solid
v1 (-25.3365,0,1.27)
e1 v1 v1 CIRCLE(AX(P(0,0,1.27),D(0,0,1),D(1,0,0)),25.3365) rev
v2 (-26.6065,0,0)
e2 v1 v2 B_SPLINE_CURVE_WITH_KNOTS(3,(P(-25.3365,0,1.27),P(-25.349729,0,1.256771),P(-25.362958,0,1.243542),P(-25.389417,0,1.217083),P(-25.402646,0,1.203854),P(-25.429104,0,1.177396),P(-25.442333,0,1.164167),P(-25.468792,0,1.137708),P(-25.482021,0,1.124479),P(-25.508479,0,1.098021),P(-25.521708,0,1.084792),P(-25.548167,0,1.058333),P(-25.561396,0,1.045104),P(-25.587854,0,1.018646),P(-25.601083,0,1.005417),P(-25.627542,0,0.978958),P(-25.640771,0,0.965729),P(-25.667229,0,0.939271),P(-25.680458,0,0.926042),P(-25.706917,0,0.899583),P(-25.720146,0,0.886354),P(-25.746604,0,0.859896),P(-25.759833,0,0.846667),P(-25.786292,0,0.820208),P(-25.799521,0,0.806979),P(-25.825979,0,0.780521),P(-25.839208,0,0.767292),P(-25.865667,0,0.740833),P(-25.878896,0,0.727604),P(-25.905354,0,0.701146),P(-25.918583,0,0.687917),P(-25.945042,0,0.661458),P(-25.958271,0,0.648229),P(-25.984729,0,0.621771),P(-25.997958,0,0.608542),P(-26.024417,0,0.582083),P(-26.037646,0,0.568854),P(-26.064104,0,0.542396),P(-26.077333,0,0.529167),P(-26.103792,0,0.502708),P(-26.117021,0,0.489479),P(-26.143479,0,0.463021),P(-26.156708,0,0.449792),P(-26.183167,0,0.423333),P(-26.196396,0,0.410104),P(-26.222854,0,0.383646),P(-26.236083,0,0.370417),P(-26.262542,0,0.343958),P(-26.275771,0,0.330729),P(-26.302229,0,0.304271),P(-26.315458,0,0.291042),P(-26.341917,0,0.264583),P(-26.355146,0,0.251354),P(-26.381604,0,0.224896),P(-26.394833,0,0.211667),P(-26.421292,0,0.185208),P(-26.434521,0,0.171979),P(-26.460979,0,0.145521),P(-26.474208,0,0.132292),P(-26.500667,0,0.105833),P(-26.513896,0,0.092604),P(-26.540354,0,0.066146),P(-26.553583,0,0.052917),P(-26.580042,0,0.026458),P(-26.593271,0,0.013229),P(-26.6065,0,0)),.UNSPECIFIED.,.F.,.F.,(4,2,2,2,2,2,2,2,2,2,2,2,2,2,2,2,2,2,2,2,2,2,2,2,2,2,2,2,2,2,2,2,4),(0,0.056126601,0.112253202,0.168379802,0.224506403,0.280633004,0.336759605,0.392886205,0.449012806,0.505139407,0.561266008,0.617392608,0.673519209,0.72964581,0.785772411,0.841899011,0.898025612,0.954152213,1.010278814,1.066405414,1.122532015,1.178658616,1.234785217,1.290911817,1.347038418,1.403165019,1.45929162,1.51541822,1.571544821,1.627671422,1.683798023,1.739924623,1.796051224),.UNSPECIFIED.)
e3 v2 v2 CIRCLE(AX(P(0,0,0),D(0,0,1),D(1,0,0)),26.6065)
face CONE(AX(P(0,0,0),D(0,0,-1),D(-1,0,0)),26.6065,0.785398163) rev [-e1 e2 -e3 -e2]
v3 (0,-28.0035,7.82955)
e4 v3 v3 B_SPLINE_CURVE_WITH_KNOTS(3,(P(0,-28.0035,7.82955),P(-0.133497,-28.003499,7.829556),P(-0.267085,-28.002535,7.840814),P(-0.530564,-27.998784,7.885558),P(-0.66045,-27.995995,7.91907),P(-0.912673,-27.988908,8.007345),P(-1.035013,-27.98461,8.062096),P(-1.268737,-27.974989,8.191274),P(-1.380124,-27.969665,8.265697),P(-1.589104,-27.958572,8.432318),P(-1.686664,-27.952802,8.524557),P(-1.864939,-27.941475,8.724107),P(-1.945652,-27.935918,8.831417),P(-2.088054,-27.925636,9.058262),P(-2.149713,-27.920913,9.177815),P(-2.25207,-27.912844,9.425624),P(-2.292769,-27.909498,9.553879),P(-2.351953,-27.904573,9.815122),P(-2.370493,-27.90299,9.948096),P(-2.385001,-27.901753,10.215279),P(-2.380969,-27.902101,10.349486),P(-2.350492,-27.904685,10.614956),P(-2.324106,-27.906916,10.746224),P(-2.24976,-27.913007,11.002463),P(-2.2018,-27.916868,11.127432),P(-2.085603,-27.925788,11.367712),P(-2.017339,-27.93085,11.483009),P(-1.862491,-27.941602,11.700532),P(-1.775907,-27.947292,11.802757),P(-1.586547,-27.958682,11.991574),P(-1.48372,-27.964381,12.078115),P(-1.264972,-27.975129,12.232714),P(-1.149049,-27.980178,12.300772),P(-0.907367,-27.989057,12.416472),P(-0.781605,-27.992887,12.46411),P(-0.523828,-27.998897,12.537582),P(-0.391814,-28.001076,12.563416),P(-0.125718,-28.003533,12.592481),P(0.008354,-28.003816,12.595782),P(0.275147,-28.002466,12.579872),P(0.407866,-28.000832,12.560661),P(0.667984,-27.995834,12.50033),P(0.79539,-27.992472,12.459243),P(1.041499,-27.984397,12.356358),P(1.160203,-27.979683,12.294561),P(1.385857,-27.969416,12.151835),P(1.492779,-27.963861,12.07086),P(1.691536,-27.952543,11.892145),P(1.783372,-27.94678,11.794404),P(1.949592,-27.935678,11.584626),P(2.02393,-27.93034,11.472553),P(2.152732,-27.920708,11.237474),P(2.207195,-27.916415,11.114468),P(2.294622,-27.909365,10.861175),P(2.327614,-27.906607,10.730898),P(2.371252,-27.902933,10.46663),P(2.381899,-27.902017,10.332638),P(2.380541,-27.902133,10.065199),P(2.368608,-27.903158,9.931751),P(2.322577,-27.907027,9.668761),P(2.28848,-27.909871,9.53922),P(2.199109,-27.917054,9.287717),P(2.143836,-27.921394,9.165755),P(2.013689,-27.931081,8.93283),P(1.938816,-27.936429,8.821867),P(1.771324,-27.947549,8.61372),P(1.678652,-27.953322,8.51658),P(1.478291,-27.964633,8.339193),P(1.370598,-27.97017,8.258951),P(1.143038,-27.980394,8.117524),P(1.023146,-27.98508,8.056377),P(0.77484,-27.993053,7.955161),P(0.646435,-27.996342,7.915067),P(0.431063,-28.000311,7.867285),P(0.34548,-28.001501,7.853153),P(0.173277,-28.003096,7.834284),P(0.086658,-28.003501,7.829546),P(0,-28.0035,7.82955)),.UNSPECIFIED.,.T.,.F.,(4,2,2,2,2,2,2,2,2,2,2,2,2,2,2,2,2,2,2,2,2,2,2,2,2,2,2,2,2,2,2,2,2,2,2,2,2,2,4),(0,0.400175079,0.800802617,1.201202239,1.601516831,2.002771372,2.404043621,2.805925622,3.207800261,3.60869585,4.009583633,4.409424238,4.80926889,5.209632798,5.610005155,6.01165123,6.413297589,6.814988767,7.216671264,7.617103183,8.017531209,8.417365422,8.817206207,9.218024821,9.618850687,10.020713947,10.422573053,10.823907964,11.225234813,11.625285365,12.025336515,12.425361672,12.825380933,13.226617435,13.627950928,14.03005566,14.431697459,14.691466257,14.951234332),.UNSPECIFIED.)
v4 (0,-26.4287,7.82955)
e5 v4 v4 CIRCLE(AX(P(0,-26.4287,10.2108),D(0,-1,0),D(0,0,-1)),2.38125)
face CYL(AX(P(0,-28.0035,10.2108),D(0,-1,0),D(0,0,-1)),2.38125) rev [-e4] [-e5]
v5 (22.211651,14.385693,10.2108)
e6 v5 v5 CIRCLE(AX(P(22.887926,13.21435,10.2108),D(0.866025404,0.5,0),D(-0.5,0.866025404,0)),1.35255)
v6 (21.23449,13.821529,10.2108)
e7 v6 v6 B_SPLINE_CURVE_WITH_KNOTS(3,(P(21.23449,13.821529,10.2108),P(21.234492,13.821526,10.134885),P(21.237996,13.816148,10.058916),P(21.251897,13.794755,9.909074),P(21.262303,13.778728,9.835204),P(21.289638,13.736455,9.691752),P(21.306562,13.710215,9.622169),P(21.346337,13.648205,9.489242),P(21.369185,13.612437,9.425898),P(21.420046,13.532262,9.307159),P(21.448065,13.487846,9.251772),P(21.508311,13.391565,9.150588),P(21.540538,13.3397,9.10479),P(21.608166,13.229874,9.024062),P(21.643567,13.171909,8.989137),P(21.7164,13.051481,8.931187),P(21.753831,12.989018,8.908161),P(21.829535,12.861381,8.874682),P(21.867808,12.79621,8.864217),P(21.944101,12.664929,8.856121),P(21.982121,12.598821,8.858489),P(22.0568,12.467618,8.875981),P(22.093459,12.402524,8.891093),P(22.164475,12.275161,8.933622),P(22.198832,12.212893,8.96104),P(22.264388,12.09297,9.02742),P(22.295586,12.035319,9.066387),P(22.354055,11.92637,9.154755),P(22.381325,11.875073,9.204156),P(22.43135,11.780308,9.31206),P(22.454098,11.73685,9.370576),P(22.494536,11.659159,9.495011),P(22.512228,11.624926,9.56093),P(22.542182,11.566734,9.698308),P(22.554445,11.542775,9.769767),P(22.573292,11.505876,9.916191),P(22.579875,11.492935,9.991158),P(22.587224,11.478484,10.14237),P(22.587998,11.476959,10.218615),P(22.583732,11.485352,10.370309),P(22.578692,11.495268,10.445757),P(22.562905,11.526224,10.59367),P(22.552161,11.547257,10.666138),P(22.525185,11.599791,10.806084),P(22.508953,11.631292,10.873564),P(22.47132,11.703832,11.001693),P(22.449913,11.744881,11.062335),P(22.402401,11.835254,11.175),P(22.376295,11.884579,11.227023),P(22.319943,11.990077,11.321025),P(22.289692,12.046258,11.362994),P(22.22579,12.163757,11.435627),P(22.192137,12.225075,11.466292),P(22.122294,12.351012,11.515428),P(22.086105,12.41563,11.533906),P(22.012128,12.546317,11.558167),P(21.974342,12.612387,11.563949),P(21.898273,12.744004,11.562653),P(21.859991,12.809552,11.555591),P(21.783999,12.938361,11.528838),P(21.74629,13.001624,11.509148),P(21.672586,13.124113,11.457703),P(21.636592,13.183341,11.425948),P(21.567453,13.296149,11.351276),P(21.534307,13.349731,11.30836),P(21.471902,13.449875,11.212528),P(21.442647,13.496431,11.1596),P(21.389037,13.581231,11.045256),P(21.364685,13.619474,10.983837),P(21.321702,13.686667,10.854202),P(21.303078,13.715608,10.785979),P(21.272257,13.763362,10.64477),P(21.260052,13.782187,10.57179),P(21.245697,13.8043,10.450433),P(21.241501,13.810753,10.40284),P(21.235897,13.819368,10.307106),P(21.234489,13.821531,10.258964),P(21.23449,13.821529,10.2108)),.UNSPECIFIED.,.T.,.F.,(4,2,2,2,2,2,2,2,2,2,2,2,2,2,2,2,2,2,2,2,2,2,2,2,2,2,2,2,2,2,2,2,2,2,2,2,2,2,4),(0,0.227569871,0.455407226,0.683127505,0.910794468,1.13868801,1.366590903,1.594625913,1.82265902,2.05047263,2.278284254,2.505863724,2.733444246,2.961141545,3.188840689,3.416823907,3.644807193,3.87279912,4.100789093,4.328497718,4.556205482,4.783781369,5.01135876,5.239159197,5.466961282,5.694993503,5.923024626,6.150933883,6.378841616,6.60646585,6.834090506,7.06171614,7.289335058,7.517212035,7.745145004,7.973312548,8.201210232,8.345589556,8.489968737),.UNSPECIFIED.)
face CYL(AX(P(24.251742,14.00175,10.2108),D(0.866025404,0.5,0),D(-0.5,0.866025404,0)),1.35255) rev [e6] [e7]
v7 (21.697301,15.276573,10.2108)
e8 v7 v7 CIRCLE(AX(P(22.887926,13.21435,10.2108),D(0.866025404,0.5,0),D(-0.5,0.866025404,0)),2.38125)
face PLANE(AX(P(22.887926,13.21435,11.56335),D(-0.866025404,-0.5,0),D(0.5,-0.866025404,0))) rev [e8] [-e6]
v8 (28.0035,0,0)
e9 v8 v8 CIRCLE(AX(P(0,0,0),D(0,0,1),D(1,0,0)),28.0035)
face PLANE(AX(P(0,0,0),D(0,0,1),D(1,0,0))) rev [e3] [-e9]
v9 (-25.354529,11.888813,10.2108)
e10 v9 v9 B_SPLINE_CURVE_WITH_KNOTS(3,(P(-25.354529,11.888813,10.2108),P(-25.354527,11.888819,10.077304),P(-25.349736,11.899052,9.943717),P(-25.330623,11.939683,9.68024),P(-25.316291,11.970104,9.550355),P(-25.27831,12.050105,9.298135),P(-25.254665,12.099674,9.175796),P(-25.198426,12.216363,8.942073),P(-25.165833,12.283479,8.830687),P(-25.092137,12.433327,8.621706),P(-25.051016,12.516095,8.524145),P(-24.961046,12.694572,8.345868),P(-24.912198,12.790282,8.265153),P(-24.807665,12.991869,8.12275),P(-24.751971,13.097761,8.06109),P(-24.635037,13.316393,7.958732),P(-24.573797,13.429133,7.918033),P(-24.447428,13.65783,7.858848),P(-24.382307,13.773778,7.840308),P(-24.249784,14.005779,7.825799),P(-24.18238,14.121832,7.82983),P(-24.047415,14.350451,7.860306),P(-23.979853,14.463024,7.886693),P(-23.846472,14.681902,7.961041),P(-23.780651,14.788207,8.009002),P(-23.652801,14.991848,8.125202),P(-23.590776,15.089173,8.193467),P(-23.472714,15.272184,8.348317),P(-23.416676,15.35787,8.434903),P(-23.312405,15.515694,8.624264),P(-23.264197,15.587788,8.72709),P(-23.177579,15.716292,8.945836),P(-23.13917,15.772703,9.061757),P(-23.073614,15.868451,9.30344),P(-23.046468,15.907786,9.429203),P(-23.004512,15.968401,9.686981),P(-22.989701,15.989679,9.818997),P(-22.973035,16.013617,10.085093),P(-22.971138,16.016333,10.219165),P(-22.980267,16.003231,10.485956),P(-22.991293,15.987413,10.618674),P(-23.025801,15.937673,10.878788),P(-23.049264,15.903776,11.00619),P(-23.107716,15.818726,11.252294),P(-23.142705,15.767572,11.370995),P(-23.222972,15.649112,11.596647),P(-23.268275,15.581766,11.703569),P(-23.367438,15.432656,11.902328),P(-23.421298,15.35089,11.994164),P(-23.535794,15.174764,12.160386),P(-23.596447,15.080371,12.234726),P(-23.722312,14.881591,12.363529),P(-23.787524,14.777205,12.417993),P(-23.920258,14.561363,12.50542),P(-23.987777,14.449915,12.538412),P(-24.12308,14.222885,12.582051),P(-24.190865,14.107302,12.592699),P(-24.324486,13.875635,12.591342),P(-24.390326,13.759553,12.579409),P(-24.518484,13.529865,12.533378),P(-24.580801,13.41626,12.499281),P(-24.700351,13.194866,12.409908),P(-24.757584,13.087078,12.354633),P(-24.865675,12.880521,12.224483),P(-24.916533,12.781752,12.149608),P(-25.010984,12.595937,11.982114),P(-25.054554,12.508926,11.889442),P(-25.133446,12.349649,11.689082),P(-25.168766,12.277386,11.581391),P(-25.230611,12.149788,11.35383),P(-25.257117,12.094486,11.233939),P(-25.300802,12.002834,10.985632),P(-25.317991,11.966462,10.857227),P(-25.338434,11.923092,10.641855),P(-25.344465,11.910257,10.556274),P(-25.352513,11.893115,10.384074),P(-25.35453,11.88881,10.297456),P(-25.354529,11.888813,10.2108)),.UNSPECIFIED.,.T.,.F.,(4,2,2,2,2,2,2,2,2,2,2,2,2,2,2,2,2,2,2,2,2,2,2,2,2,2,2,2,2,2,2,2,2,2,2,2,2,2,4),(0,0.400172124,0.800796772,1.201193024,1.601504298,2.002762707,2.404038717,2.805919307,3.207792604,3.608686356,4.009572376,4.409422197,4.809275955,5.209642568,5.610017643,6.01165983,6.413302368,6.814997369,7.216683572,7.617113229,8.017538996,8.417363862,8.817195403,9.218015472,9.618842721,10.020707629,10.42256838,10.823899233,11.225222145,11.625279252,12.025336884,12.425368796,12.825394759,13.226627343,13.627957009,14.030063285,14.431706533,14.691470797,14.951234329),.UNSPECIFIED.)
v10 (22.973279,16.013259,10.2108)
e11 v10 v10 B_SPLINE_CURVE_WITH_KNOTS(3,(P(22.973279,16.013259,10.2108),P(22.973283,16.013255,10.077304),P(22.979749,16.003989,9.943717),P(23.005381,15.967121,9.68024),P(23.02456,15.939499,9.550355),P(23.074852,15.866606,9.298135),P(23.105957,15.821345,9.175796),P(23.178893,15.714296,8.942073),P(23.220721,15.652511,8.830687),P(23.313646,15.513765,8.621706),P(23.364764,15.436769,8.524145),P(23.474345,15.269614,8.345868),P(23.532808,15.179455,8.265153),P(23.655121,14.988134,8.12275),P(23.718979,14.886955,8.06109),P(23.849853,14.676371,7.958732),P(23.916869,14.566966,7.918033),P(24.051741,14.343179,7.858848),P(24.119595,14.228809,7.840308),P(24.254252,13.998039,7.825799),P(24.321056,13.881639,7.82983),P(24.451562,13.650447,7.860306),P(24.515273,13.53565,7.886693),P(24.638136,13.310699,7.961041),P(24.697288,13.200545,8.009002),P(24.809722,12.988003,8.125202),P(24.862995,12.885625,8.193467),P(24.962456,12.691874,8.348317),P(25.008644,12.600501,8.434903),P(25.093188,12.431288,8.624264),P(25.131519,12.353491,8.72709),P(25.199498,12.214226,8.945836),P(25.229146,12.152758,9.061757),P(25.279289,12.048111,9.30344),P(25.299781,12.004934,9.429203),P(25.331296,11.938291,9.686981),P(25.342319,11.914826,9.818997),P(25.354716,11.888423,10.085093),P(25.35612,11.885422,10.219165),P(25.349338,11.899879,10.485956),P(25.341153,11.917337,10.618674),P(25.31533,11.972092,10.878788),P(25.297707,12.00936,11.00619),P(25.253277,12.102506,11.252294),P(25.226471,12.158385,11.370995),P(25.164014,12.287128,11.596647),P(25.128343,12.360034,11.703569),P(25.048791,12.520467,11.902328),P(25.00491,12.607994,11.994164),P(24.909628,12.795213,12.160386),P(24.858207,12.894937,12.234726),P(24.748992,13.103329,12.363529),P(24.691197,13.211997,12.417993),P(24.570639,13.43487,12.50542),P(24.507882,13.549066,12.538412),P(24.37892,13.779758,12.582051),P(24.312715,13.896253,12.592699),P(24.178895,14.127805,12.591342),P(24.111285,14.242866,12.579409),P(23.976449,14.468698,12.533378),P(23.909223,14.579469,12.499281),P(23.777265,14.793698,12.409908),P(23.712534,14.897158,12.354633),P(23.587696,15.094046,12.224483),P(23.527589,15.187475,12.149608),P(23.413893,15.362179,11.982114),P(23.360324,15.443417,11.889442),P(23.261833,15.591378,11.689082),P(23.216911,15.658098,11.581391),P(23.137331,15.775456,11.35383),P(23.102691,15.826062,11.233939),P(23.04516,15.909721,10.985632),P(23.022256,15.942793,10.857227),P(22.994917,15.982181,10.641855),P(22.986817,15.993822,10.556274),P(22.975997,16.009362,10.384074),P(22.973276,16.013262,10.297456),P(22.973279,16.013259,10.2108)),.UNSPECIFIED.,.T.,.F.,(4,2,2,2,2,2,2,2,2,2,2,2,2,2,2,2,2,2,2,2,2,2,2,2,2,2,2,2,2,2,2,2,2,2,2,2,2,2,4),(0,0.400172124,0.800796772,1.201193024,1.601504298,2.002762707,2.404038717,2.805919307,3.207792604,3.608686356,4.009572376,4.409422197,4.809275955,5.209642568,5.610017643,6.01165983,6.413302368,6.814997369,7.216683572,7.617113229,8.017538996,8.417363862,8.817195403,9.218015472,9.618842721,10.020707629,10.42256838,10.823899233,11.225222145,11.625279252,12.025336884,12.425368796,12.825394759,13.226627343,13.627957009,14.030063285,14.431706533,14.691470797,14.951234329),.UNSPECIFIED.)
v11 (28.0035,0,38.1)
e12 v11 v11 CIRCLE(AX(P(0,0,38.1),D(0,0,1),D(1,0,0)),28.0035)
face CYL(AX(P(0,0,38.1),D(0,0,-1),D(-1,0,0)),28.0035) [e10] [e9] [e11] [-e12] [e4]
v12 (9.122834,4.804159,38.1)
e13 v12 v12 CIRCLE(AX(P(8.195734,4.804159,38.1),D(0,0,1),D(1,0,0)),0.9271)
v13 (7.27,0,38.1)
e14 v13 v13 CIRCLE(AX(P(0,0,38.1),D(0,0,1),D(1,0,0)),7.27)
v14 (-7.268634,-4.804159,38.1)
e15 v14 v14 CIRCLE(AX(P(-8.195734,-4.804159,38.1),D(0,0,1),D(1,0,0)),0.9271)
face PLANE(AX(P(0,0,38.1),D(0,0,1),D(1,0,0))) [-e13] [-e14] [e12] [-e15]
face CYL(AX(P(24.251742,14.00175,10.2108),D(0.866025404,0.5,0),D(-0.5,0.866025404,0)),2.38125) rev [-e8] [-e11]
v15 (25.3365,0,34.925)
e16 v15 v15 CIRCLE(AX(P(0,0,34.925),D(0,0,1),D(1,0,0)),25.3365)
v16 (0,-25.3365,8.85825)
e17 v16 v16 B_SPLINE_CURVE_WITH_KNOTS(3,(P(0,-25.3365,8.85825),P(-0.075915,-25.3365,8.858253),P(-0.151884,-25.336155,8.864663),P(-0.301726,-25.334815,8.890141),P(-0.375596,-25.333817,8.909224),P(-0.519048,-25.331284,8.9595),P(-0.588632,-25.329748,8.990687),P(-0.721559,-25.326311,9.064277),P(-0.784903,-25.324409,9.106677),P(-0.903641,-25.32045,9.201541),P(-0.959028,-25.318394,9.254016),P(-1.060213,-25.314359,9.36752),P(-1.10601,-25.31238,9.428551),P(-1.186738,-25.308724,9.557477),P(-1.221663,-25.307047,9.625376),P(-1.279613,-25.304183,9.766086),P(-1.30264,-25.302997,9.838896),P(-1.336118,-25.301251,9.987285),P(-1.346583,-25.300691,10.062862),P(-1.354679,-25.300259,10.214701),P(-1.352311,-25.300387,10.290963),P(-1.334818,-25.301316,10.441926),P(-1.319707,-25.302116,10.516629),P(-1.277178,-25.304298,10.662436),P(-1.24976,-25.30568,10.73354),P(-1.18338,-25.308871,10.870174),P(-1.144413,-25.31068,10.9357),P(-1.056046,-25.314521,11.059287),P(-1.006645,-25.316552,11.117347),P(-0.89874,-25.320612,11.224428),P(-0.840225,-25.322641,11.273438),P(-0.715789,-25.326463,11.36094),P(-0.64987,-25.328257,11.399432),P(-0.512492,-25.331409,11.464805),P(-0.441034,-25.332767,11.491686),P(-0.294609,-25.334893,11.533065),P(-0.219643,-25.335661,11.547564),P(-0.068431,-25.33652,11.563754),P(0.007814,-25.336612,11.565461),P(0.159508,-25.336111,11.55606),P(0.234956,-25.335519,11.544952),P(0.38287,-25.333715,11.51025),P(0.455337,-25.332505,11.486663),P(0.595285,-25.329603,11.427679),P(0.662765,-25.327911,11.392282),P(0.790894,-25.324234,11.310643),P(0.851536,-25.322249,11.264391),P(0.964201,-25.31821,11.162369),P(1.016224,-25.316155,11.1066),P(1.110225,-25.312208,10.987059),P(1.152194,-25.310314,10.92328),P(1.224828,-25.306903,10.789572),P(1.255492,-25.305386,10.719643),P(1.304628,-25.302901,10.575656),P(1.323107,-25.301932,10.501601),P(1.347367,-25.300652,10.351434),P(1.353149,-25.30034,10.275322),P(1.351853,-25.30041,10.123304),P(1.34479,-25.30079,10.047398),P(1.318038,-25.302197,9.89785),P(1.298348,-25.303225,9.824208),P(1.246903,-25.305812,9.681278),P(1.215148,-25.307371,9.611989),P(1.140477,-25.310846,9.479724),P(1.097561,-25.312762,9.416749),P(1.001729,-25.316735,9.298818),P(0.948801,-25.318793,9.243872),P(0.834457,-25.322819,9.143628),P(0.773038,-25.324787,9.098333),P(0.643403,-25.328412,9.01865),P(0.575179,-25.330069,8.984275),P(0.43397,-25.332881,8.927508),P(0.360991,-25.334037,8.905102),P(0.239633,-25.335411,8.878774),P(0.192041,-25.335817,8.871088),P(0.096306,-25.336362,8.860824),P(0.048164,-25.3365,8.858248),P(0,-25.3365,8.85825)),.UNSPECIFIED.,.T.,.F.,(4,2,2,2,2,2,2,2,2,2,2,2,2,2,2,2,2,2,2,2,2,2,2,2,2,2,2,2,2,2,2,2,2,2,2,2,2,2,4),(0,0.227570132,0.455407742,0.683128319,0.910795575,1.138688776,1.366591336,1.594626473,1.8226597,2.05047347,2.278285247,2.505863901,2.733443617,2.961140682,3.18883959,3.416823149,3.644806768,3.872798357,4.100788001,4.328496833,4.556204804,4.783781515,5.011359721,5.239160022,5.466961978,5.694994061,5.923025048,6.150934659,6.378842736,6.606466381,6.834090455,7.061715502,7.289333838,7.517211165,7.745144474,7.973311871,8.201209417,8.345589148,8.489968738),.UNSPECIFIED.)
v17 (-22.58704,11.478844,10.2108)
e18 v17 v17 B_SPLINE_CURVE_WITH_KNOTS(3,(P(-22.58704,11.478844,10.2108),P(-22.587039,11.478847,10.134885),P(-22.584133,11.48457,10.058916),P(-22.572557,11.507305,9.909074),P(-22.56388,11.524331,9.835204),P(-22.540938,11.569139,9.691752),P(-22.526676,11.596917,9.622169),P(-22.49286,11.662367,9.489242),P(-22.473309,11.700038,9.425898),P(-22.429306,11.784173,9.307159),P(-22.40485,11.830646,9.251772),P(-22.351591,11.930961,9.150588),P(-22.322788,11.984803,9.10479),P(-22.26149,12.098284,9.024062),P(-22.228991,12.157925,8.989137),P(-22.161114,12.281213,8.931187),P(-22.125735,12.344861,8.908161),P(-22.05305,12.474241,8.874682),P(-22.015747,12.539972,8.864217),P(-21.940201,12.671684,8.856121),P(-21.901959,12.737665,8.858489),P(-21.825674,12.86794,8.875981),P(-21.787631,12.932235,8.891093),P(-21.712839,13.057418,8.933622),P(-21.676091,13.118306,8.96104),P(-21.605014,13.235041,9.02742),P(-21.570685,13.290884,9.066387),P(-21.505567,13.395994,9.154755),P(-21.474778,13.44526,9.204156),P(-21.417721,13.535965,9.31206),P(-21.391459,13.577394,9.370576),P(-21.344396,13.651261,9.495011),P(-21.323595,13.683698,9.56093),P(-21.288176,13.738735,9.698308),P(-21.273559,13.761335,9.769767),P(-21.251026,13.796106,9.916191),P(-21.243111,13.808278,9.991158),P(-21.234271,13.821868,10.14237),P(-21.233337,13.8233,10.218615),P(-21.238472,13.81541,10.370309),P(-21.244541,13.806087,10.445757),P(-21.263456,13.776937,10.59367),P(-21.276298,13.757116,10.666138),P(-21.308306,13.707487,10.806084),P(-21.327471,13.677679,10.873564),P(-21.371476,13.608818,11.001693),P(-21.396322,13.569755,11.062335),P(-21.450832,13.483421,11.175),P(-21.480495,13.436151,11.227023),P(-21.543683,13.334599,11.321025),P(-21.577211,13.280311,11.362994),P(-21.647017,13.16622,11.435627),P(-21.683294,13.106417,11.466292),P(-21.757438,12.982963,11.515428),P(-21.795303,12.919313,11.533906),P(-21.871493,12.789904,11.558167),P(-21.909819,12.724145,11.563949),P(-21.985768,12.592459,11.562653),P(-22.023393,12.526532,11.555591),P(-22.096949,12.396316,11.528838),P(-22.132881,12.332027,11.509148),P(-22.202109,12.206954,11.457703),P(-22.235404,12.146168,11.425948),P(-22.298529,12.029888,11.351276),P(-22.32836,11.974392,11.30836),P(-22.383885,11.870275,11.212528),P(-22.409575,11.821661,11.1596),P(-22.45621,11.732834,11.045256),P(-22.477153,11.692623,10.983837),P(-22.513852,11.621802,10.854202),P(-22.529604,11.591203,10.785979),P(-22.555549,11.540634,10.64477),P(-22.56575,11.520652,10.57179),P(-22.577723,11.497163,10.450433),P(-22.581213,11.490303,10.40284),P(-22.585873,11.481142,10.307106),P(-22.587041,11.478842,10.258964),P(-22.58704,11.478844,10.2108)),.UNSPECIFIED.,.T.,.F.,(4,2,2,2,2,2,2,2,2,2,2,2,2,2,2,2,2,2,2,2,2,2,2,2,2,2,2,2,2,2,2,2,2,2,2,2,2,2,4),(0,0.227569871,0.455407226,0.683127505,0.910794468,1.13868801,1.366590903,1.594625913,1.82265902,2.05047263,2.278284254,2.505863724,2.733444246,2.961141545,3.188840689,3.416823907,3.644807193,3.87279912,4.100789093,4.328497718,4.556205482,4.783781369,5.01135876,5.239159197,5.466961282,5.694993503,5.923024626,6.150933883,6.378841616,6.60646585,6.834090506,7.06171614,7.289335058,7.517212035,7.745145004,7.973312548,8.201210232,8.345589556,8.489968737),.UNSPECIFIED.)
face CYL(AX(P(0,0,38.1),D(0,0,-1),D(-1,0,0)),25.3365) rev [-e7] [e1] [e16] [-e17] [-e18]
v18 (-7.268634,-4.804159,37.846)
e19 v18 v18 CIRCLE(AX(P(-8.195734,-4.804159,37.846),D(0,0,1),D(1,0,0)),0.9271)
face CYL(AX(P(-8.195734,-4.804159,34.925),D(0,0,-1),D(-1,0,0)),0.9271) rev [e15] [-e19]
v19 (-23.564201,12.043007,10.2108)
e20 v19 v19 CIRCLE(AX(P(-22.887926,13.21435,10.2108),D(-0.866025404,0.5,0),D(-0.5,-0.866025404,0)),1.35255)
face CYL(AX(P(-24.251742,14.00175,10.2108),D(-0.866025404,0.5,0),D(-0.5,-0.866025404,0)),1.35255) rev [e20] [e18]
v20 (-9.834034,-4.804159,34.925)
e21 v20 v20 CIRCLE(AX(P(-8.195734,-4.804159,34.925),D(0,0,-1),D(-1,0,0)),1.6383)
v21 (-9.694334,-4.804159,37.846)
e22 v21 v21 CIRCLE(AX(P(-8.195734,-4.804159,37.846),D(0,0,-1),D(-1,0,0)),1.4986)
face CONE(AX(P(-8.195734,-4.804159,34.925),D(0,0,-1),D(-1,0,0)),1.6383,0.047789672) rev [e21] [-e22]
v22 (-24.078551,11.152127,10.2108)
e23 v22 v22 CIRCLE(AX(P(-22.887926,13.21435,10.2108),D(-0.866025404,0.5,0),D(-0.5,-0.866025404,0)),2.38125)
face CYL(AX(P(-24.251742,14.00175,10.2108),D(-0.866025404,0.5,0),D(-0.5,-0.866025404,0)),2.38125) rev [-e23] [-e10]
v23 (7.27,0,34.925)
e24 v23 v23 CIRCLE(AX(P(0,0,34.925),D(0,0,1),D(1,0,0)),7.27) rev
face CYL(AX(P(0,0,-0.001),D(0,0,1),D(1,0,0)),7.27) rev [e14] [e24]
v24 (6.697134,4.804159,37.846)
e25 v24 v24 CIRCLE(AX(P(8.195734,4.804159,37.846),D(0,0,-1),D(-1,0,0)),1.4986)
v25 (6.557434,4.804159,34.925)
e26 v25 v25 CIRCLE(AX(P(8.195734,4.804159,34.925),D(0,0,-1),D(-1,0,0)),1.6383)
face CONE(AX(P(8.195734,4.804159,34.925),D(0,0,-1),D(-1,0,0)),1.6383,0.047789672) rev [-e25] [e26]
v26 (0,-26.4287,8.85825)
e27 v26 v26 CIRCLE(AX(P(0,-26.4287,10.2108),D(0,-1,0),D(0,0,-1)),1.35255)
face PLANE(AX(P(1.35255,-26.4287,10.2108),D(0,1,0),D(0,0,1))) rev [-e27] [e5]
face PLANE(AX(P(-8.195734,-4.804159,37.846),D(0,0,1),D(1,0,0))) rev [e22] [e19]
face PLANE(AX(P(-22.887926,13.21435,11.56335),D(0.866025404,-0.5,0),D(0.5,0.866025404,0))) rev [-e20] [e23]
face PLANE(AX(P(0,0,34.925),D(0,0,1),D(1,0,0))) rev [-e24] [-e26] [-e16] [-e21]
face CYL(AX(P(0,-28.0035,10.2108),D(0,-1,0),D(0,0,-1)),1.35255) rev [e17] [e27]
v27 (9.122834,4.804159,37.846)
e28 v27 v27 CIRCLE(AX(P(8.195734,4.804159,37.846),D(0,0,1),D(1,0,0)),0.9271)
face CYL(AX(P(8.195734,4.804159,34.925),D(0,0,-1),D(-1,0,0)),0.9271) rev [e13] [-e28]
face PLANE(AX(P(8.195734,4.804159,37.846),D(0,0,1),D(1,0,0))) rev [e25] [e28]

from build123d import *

# Parameters (mm, degrees)
SKETCH1_R                                   = 28.0035
SKETCH1_R_2                                 = 25.3365
BOSS_EXTRUDE1_DEPTH                         = 38.1
BOSS_EXTRUDE2_START                         = -3.175
SKETCH10_R                                  = 28.0035
BOSS_EXTRUDE2_DEPTH                         = 3.175
CBORE_START                                 = -28.003500075
CBORE_FOR_2_PAN_HEAD_MACHINE_SCREW1_OUT_R   = 2.38125
CBORE_FOR_2_PAN_HEAD_MACHINE_SCREW1_DEPTH   = 1.574800075
CBORE_START_2                               = -26.4287
CBORE_FOR_2_PAN_HEAD_MACHINE_SCREW1_2_O_R   = 1.35255
CBORE_FOR_2_PAN_HEAD_MACHINE_SCREW1_2_DEPTH = 1.128327756
CBORE_START_3                               = 26.4287
CBORE_FOR_2_PAN_HEAD_MACHINE_SCREW2_OUT_R   = 2.38125
CBORE_FOR_2_PAN_HEAD_MACHINE_SCREW2_DEPTH   = 1.574800075
CBORE_START_4                               = 25.300372244
CBORE_FOR_2_PAN_HEAD_MACHINE_SCREW2_2_O_R   = 1.35255
CBORE_FOR_2_PAN_HEAD_MACHINE_SCREW2_2_DEPTH = 1.128327756
CBORE_START_5                               = -28.003500101
CBORE_FOR_2_PAN_HEAD_MACHINE_SCREW3_OUT_R   = 2.38125
CBORE_FOR_2_PAN_HEAD_MACHINE_SCREW3_DEPTH   = 1.574800101
CBORE_FOR_2_PAN_HEAD_MACHINE_SCREW3_2_O_R   = 1.35255
CBORE_FOR_2_PAN_HEAD_MACHINE_SCREW3_2_DEPTH = 1.128327733
CUT_EXTRUDE1_REACH                          = 56.955
SKETCH20_R                                  = 7.27
HOLE1_AT_2_COUNT                            = 2
HOLE1_AT_2_PITCH                            = 19
F_0_CLEARANCE_HOLE1_D                       = 1.8542
CHAMFER1_SIZE                               = 1.27


# Read off the part's stored shape, not the designer's step: CBORE for #2 Pan Head Machine Screw1, CBORE for #2 Pan Head Machine Screw2, CBORE for #2 Pan Head Machine Screw3
with BuildPart() as part:
    # Sketch1 → Boss-Extrude1 (new body)
    with BuildSketch(Plane.XY):
        with Locations(Location((0, 0, 0), (0, 0, 180))):
            Circle(SKETCH1_R)
        with Locations(Location((0, 0, 0), (0, 0, 180))):
            Circle(SKETCH1_R_2, mode=Mode.SUBTRACT)
    extrude(amount=BOSS_EXTRUDE1_DEPTH)

    # Sketch10 → Boss-Extrude2 (add)
    with BuildSketch(Plane.XY.offset(38.1).offset(BOSS_EXTRUDE2_START)):
        with Locations(Location((0, 0, 0), (0, 0, 180))):
            Circle(SKETCH10_R)
    extrude(amount=BOSS_EXTRUDE2_DEPTH)

    # CBORE for #2 Pan Head Machine Screw1 out → CBORE for #2 Pan Head Machine Screw1 (cut)
    with BuildSketch(Plane(origin=(0, 0, 0), x_dir=(0.500000000000004, 0.8660254037844363, 0), z_dir=(0.8660254037844363, -0.5000000000000042, 0)).offset(CBORE_START)):
        with Locations((0, 10.2108)):
            Circle(CBORE_FOR_2_PAN_HEAD_MACHINE_SCREW1_OUT_R)
    extrude(amount=CBORE_FOR_2_PAN_HEAD_MACHINE_SCREW1_DEPTH, mode=Mode.SUBTRACT)

    # CBORE for _2 Pan Head Machine Screw1 2 o → CBORE for _2 Pan Head Machine Screw1 2 (cut)
    with BuildSketch(Plane(origin=(0, 0, 0), x_dir=(0.500000000000004, 0.8660254037844363, 0), z_dir=(0.8660254037844363, -0.5000000000000042, 0)).offset(CBORE_START_2)):
        with Locations((0, 10.2108)):
            Circle(CBORE_FOR_2_PAN_HEAD_MACHINE_SCREW1_2_O_R)
    extrude(amount=CBORE_FOR_2_PAN_HEAD_MACHINE_SCREW1_2_DEPTH, mode=Mode.SUBTRACT)

    # CBORE for #2 Pan Head Machine Screw2 out → CBORE for #2 Pan Head Machine Screw2 (cut)
    with BuildSketch(Plane(origin=(0, 0, 0), x_dir=(0.500000000000004, -0.8660254037844363, 0), z_dir=(0.8660254037844363, 0.5000000000000042, 0)).offset(CBORE_START_3)):
        with Locations((0, -10.2108)):
            Circle(CBORE_FOR_2_PAN_HEAD_MACHINE_SCREW2_OUT_R)
    extrude(amount=CBORE_FOR_2_PAN_HEAD_MACHINE_SCREW2_DEPTH, mode=Mode.SUBTRACT)

    # CBORE for _2 Pan Head Machine Screw2 2 o → CBORE for _2 Pan Head Machine Screw2 2 (cut)
    with BuildSketch(Plane(origin=(0, 0, 0), x_dir=(0.500000000000004, -0.8660254037844363, 0), z_dir=(0.8660254037844363, 0.5000000000000042, 0)).offset(CBORE_START_4)):
        with Locations((0, -10.2108)):
            Circle(CBORE_FOR_2_PAN_HEAD_MACHINE_SCREW2_2_O_R)
    extrude(amount=CBORE_FOR_2_PAN_HEAD_MACHINE_SCREW2_2_DEPTH, mode=Mode.SUBTRACT)

    # CBORE for #2 Pan Head Machine Screw3 out → CBORE for #2 Pan Head Machine Screw3 (cut)
    with BuildSketch(Plane(origin=(0, 0, 0), x_dir=(1, 0, 0), z_dir=(0, 1, 0)).offset(CBORE_START_5)):
        with Locations((0, -10.2108)):
            Circle(CBORE_FOR_2_PAN_HEAD_MACHINE_SCREW3_OUT_R)
    extrude(amount=CBORE_FOR_2_PAN_HEAD_MACHINE_SCREW3_DEPTH, mode=Mode.SUBTRACT)

    # CBORE for _2 Pan Head Machine Screw3 2 o → CBORE for _2 Pan Head Machine Screw3 2 (cut)
    with BuildSketch(Plane(origin=(0, 0, 0), x_dir=(1, 0, 0), z_dir=(0, 1, 0)).offset(CBORE_START_2)):
        with Locations((0, -10.2108)):
            Circle(CBORE_FOR_2_PAN_HEAD_MACHINE_SCREW3_2_O_R)
    extrude(amount=CBORE_FOR_2_PAN_HEAD_MACHINE_SCREW3_2_DEPTH, mode=Mode.SUBTRACT)

    # Sketch20 → Cut-Extrude1 (cut, up to next)
    with BuildSketch(Plane.XY.offset(38.1), mode=Mode.PRIVATE) as cut_extrude1_sk1:
        Circle(SKETCH20_R)
    cut_extrude1_tool1 = extrude(cut_extrude1_sk1.sketch, amount=-CUT_EXTRUDE1_REACH, mode=Mode.PRIVATE) & part.part
    add(cut_extrude1_tool1.solids().sort_by_distance((0, 0, 38.1))[0], mode=Mode.SUBTRACT)

    # Sketch22 → Hole1 (revolve, cut)
    with BuildSketch(Plane(origin=(8.195734173, 4.804158758, 34.925), x_dir=(0, 1, 0), z_dir=(1, 0, 0))):
        Polygon((0, 0), (0, 2.921), (1.4986, 2.921), (1.6383, 0), align=None)
    hole1 = revolve(axis=Axis((8.195734173, 4.804158758, 144.925), (0, 0, -1)), mode=Mode.SUBTRACT)

    # Hole1 at 2: Hole1 ×2
    with Locations(*[Vector(-0.8627088602819588, -0.5057009218807137, 0) * (i * HOLE1_AT_2_PITCH) for i in range(1, HOLE1_AT_2_COUNT)]):
        add(hole1, mode=Mode.SUBTRACT)

    # #0 Clearance Hole1 (through all)
    with Locations(Plane(origin=(0, 0, 34.925), x_dir=(-1, 0, 0), z_dir=(0, 0, -1))):
        with Locations((-8.195734173, 4.804158758), (8.195734173, -4.804158758)):
            Hole(F_0_CLEARANCE_HOLE1_D / 2)

    # Chamfer1
    chamfer1_edges = [part.edges().sort_by_distance(p)[0] for p in [
        (25.3365, 0, 0),
    ]]
    chamfer(chamfer1_edges, length=CHAMFER1_SIZE)


solid = part.part
